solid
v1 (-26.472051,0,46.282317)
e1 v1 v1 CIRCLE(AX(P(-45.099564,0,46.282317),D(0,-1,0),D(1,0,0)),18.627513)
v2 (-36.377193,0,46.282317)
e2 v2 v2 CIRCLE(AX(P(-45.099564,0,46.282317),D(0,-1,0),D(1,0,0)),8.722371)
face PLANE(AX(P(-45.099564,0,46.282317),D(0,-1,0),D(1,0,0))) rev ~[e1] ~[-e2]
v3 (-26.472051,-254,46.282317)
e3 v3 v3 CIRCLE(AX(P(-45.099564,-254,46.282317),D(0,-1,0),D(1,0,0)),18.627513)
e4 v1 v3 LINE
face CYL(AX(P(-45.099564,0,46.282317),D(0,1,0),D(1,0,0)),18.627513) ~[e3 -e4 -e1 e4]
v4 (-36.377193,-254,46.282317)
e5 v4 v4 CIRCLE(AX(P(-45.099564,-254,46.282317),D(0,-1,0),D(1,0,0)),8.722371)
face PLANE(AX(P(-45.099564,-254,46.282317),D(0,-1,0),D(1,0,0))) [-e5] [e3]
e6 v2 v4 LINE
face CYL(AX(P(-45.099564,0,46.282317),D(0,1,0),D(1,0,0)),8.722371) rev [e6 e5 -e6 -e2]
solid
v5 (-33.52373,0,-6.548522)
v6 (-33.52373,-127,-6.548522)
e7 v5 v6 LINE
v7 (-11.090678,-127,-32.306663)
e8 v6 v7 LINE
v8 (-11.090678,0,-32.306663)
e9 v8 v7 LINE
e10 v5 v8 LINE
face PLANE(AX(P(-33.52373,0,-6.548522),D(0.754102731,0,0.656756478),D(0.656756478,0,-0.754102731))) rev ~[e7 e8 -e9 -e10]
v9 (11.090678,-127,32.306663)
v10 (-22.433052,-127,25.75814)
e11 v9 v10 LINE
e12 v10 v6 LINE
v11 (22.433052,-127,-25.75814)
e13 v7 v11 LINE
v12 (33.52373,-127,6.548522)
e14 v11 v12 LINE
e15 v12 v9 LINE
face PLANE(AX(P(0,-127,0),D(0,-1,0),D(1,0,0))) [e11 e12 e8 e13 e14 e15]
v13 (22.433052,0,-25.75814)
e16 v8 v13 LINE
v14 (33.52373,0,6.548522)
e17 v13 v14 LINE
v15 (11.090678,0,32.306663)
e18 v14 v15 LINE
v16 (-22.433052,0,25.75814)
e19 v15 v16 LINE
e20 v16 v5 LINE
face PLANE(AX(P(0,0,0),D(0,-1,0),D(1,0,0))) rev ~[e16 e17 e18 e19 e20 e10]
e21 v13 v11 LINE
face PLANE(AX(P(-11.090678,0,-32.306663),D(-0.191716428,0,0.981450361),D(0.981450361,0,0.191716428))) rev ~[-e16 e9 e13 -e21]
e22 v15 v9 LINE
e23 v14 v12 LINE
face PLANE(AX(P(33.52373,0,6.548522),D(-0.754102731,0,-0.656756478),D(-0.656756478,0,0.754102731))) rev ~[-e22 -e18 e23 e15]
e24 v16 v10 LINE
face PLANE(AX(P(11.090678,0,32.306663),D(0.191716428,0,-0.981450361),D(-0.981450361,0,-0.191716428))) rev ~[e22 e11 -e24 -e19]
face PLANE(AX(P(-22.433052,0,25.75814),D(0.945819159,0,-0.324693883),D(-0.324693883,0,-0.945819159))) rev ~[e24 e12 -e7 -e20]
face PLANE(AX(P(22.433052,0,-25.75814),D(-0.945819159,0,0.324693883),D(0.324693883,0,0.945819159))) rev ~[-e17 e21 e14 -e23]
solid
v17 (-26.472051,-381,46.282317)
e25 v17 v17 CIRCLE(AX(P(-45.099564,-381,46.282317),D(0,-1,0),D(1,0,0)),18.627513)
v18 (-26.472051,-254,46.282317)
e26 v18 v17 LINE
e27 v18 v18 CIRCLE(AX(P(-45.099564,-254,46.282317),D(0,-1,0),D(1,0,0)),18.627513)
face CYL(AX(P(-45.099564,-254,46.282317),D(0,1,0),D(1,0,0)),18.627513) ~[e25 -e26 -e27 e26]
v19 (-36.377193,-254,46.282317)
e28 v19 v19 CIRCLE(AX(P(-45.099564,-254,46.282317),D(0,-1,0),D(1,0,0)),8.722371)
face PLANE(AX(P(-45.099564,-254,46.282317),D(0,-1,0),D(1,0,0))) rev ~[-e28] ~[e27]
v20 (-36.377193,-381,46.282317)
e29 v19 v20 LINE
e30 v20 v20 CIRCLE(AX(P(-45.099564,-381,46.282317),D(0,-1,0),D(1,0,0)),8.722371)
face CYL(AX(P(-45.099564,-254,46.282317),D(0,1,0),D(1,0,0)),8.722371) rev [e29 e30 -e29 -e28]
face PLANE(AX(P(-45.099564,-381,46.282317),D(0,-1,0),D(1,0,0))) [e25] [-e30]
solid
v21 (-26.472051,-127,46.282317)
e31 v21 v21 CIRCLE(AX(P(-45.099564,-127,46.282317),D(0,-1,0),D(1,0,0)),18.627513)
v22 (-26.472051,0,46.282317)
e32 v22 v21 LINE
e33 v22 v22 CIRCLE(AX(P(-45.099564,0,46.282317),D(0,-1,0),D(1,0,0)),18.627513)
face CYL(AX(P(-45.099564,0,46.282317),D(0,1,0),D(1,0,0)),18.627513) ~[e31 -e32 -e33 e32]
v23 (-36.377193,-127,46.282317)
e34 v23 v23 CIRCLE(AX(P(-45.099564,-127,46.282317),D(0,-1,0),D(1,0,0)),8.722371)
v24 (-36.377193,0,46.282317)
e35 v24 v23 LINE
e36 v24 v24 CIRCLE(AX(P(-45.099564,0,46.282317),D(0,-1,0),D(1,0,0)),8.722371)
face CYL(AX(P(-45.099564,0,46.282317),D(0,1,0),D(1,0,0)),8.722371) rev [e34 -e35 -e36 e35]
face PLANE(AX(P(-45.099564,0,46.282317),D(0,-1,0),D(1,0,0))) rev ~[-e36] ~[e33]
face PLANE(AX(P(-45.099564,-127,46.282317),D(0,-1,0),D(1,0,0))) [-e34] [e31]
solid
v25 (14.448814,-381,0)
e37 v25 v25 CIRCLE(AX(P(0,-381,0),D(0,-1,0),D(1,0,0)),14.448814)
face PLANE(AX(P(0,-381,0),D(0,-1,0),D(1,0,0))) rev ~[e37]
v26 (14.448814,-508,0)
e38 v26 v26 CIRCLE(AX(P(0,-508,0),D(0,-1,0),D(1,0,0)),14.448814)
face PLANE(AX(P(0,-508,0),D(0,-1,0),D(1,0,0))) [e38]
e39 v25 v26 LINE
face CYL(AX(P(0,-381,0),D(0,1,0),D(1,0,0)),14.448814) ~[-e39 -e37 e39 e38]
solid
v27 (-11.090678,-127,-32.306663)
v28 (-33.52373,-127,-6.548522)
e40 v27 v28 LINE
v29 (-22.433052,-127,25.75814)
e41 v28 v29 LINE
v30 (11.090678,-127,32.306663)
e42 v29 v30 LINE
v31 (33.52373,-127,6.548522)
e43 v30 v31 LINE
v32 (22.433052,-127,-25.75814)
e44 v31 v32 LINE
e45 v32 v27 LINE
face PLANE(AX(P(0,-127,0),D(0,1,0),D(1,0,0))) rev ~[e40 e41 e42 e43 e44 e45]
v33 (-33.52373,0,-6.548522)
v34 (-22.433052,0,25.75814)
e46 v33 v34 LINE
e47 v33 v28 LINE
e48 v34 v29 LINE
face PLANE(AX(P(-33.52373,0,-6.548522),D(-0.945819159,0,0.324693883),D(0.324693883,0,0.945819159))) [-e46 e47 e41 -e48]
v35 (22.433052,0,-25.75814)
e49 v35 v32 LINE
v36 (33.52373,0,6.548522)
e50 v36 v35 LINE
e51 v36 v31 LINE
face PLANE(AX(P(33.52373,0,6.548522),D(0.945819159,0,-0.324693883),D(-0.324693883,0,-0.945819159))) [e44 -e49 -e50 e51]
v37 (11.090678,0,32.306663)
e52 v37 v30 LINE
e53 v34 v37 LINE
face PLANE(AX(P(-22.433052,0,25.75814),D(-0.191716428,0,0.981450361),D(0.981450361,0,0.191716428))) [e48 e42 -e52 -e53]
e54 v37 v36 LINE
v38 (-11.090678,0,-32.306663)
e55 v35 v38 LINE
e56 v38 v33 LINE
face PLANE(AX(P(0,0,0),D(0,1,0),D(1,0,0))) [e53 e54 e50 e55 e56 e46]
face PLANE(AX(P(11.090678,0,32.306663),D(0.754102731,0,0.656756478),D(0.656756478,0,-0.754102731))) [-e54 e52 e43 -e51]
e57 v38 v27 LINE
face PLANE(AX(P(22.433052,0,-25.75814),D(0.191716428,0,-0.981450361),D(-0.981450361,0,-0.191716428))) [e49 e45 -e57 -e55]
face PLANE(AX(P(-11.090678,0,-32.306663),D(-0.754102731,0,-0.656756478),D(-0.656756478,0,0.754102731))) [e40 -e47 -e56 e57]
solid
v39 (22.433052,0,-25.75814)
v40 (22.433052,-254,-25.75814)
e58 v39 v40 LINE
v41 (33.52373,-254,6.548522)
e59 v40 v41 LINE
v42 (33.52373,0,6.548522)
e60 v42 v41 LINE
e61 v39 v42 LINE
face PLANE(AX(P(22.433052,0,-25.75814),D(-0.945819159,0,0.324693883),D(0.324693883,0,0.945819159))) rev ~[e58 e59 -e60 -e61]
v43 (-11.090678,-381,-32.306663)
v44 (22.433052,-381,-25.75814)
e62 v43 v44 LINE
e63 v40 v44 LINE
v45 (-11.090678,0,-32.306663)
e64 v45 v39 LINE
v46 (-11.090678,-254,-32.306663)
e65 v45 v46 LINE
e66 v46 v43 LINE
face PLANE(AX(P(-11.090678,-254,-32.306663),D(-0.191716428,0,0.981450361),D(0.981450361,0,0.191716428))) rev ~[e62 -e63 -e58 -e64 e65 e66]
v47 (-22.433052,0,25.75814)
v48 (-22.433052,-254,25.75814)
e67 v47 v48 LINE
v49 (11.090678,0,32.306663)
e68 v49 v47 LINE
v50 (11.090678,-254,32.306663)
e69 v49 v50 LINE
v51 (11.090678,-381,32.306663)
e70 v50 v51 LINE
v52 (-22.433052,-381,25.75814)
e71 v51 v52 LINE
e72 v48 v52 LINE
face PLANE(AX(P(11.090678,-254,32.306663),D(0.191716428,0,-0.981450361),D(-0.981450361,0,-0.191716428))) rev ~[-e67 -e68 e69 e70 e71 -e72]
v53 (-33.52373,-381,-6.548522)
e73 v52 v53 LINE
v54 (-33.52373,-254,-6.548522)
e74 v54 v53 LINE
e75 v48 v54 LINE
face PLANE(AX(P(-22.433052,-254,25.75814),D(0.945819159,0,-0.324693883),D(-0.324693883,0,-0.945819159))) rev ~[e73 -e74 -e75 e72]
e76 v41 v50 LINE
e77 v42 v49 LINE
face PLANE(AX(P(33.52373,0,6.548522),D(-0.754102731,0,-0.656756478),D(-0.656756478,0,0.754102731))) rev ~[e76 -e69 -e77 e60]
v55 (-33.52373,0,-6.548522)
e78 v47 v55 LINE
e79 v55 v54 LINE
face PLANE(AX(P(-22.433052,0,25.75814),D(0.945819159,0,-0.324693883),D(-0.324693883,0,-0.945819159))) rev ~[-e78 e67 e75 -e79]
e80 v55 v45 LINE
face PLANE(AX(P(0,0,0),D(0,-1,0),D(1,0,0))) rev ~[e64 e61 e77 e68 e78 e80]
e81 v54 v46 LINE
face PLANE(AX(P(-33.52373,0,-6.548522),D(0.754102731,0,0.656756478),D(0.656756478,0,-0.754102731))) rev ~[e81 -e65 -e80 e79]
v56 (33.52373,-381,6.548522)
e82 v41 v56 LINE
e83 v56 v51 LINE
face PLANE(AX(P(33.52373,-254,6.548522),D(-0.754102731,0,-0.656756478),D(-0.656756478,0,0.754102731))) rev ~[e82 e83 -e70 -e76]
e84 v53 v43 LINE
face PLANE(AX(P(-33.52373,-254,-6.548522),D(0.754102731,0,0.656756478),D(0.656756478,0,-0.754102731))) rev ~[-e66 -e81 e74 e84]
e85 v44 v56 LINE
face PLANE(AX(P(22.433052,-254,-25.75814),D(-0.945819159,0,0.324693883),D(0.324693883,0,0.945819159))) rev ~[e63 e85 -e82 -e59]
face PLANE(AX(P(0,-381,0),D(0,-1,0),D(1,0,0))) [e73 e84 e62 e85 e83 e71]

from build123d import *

# Parameters (mm, degrees)
F1_DEPTH = 254
F0_R     = 18.6275130074
F0_R_2   = 8.7223710734
F2_R     = 17.1106148406
F2_R_2   = 18.6275130074
F2_R_3   = 8.7223710734
F3_DEPTH = 127
F4_DEPTH = 127
F6_R     = 14.4488141118
F7_DEPTH = 127


with BuildPart() as f1:
    # F0 (on Front) → F1 (new body)
    with BuildSketch(Plane.XZ):
        Polygon((11.0906781218, 32.3066629883), (-22.4330517984, 25.7581404928), (-33.5237299203, -6.5485224954), (-11.0906781218, -32.3066629883), (22.4330517984, -25.7581404928), (33.5237299203, 6.5485224954), align=None)
    extrude(amount=F1_DEPTH)

    # F2 (on face) + F1_face (on face) → F3 (join)
    with BuildSketch(Plane.XZ.offset(254)):
        Circle(F2_R)
        with Locations((-45.0995638967, 46.2823174894)):
            Circle(F2_R_2)
        with Locations((-45.0995638967, 46.2823174894)):
            Circle(F2_R_3, mode=Mode.SUBTRACT)
    with BuildSketch(Plane(origin=(-45.0995638967, -254, 46.2823174894), x_dir=(1, 0, 0), z_dir=(0, -1, 0))):
        Polygon((56.1902420185, -13.9756545011), (22.6665120982, -20.5241769966), (11.5758339764, -52.8308399848), (34.0088857748, -78.5889804777), (67.5326156951, -72.0404579822), (78.6232938169, -39.733794994), align=None)
    extrude(amount=F3_DEPTH)


with BuildPart() as f1b:
    # F0 (on Front) → F1, piece 2 (new body)
    with BuildSketch(Plane.XZ):
        with Locations((-45.0995638967, 46.2823174894)):
            Circle(F0_R)
        with Locations((-45.0995638967, 46.2823174894)):
            Circle(F0_R_2, mode=Mode.SUBTRACT)
    extrude(amount=F1_DEPTH)


with BuildPart() as f4:
    # F0 (on Front) → F4 (new body)
    with BuildSketch(Plane.XZ):
        Polygon((11.0906781218, 32.3066629883), (-22.4330517984, 25.7581404928), (-33.5237299203, -6.5485224954), (-11.0906781218, -32.3066629883), (22.4330517984, -25.7581404928), (33.5237299203, 6.5485224954), align=None)
    extrude(amount=F4_DEPTH)


with BuildPart() as f4b:
    # F0 (on Front) → F4, piece 2 (new body)
    with BuildSketch(Plane.XZ):
        with Locations((-45.0995638967, 46.2823174894)):
            Circle(F0_R)
        with Locations((-45.0995638967, 46.2823174894)):
            Circle(F0_R_2, mode=Mode.SUBTRACT)
    extrude(amount=F4_DEPTH)


with BuildPart() as f7:
    # F6 (on face) + F1_face1 (on face) → F7 (new body)
    with BuildSketch(Plane.XZ.offset(381)):
        Circle(F6_R)
    with BuildSketch(Plane(origin=(0, 0, 0), x_dir=(1, 0, 0), z_dir=(0, 1, 0))):
        Polygon((-22.4330517984, -25.7581404928), (11.0906781218, -32.3066629883), (33.5237299203, -6.5485224954), (22.4330517984, 25.7581404928), (-11.0906781218, 32.3066629883), (-33.5237299203, 6.5485224954), align=None)
    extrude(amount=F7_DEPTH, dir=(0, -1, 0))


solid = Compound([f1.part, f1b.part, f4.part, f4b.part, f7.part])
